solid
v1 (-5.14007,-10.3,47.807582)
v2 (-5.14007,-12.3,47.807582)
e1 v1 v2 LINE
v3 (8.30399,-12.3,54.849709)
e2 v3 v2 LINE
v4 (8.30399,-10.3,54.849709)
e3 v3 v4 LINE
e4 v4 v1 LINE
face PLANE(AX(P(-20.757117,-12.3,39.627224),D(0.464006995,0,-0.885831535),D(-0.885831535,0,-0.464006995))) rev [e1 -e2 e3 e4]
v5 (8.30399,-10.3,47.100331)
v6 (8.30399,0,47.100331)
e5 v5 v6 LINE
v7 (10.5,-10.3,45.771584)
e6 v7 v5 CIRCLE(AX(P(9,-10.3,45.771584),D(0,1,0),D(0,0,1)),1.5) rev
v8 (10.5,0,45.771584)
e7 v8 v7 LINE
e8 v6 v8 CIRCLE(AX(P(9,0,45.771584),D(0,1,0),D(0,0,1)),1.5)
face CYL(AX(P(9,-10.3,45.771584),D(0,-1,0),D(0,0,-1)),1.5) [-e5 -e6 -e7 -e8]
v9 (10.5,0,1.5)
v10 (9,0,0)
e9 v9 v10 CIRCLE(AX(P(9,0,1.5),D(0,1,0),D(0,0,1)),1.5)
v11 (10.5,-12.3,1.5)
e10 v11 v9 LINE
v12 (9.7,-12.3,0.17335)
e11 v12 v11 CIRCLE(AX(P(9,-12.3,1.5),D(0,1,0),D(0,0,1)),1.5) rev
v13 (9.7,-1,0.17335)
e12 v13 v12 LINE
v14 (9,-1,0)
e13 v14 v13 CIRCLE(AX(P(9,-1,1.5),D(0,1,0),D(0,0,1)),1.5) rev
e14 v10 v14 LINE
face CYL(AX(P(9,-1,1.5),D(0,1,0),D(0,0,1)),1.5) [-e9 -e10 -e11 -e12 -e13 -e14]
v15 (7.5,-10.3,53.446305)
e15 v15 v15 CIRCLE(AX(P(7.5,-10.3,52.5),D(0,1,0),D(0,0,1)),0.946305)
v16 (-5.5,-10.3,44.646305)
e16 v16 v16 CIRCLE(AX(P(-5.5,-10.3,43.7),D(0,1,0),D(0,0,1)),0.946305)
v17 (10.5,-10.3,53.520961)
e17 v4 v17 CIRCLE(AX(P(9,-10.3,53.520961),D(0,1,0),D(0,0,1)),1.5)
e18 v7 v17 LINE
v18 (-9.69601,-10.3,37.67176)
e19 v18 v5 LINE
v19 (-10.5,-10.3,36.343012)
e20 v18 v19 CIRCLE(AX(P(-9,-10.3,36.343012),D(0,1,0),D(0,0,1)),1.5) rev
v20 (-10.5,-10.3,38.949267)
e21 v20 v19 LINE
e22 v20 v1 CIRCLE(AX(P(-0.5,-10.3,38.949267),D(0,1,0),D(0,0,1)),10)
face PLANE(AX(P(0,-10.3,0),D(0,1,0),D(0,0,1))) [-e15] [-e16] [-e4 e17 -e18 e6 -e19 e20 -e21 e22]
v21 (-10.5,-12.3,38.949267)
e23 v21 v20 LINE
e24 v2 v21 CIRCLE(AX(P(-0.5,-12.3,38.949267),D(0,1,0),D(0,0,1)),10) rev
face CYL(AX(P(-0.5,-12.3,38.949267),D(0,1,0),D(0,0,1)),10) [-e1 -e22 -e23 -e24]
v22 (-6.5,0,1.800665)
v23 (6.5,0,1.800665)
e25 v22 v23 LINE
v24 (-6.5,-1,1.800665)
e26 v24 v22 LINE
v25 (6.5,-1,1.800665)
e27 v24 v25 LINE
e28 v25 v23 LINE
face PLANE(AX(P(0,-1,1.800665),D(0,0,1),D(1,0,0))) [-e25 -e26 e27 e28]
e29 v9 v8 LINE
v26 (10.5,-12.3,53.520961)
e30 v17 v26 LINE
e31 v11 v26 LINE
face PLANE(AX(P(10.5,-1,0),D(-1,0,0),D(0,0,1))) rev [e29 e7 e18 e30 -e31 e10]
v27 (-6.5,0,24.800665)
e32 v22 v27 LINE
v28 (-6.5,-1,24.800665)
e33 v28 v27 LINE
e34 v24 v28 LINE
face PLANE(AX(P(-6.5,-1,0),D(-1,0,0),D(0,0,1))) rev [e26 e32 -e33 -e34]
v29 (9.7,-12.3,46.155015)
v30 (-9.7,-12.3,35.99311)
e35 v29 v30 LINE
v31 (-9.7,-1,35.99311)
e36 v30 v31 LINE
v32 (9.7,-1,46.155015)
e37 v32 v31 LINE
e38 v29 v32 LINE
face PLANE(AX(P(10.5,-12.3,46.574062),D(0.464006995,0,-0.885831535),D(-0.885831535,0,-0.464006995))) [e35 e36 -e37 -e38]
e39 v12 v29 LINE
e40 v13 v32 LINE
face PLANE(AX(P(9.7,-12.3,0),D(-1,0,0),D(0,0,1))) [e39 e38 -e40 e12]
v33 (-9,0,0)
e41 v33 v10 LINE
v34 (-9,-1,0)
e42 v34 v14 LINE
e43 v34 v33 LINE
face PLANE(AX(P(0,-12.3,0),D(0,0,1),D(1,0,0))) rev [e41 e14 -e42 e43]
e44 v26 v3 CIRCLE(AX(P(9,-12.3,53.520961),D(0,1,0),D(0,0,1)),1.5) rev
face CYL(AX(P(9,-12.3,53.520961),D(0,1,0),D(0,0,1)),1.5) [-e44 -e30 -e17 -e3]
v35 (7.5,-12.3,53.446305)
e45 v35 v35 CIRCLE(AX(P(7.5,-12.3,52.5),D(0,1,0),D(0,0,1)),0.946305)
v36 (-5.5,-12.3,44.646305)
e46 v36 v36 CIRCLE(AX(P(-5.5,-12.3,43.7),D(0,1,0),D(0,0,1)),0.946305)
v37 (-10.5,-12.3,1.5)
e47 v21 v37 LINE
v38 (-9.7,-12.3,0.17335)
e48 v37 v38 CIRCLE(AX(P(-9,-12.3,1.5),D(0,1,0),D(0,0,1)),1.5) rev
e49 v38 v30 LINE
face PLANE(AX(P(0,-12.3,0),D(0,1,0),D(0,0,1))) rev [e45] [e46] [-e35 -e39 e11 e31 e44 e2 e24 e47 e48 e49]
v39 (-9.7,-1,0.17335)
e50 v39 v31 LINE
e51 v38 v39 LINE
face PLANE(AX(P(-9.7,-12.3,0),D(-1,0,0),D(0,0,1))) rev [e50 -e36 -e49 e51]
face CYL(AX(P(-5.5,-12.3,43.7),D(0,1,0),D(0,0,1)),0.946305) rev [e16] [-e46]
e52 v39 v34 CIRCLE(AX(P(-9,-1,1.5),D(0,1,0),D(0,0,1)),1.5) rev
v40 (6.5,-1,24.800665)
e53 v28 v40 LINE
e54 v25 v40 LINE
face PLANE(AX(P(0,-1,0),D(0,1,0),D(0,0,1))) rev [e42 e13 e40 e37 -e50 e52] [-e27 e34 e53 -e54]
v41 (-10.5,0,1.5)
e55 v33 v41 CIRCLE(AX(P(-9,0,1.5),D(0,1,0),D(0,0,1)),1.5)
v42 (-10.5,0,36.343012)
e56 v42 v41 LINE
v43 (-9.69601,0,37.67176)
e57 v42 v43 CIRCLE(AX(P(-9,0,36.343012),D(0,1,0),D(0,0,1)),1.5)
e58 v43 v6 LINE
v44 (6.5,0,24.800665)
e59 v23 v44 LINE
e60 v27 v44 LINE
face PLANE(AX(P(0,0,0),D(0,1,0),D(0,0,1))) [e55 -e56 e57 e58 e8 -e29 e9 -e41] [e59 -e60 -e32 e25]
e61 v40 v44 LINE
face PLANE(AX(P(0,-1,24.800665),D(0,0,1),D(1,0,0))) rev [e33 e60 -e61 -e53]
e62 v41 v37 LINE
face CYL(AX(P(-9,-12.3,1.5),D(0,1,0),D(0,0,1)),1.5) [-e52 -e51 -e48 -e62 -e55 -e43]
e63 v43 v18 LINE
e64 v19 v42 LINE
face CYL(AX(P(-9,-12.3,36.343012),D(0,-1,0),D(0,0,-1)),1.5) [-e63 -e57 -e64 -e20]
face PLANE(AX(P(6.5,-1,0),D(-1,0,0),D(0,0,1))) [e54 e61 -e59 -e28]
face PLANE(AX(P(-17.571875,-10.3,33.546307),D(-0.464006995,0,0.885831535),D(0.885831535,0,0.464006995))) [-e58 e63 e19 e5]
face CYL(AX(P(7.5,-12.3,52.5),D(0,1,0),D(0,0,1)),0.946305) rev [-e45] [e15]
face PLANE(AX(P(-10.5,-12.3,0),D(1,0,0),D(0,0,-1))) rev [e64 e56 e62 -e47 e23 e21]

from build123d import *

# Parameters (mm, degrees)
BOSS_EXTRUDE1_DEPTH   = 12.3
BOSS_EXTRUDE1_2_DEPTH = 12.3
SKETCH1_3_W           = 13
SKETCH1_3_H           = 23
BOSS_EXTRUDE2_DEPTH   = 1
SKETCH1_4_R           = 0.946305397
BOSS_EXTRUDE3_DEPTH   = 12.3
SKETCH1_6_R           = 0.946305397
CUT_EXTRUDE2_DEPTH    = 10.3
FILLET1_R             = 10
FILLET2_R             = 1.5


with BuildPart() as part:
    # Sketch1 → Boss-Extrude1 (new body)
    with BuildSketch(Plane(origin=(0, 0, 0), x_dir=(1, 0, 0), z_dir=(0, 1, 0))):
        Polygon((-9.7, 0), (-10.5, 0), (-10.5, -35.574062231), (-9.7, -35.99310985), align=None)
    extrude(amount=-BOSS_EXTRUDE1_DEPTH)



with BuildPart() as body_2:
    # Sketch1 → Boss-Extrude1 2 (new body)
    with BuildSketch(Plane(origin=(0, 0, 0), x_dir=(1, 0, 0), z_dir=(0, 1, 0))):
        Polygon((10.5, 0), (9.7, 0), (9.7, -46.155014612), (10.5, -46.574062231), align=None)
    extrude(amount=-BOSS_EXTRUDE1_2_DEPTH)


with BuildPart() as part_1:
    add(part.part)

    add(body_2.part)  # Boss-Extrude2 merges body 2
    # Sketch1<3> → Boss-Extrude2 (add)
    with BuildSketch(Plane(origin=(0, 0, 0), x_dir=(1, 0, 0), z_dir=(0, 1, 0))):
        Polygon((9.7, 0), (-9.7, 0), (-9.7, -36.489905511), (-10.5, -36.489905511), (-10.5, -37.250622364), (10.5, -48.250622364), (10.5, -46.642015581), (9.7, -46.642015581), align=None)
        with Locations((0, -13.300665343)):
            Rectangle(SKETCH1_3_W, SKETCH1_3_H, mode=Mode.SUBTRACT)
    extrude(amount=-BOSS_EXTRUDE2_DEPTH)

    # Sketch1<4> → Boss-Extrude3 (add)
    with BuildSketch(Plane(origin=(0, 0, 0), x_dir=(1, 0, 0), z_dir=(0, 1, 0))):
        Polygon((-10.5, -35.574062231), (-10.5, -45), (10.5, -56), (10.5, -46.574062231), align=None)
        with Locations((7.5, -52.5)):
            Circle(SKETCH1_4_R, mode=Mode.SUBTRACT)
        with Locations((-5.5, -43.7)):
            Circle(SKETCH1_4_R, mode=Mode.SUBTRACT)
    extrude(amount=-BOSS_EXTRUDE3_DEPTH)

    # Sketch1<6> → Cut-Extrude2 (cut)
    with BuildSketch(Plane(origin=(0, 0, 0), x_dir=(1, 0, 0), z_dir=(0, 1, 0))):
        Polygon((10.5, -48.250622364), (-10.5, -37.250622364), (-10.5, -45), (10.5, -56), align=None)
        with Locations((-5.5, -43.7)):
            Circle(SKETCH1_6_R, mode=Mode.SUBTRACT)
        with Locations((7.5, -52.5)):
            Circle(SKETCH1_6_R, mode=Mode.SUBTRACT)
    extrude(amount=-CUT_EXTRUDE2_DEPTH, mode=Mode.SUBTRACT)

    # Fillet1
    fillet1_edges = [part_1.edges().sort_by_distance(p)[0] for p in [
        (-10.5, -11.3, 45),
    ]]
    fillet(fillet1_edges, radius=FILLET1_R)

    # Fillet2
    fillet2_edges = [part_1.edges().sort_by_distance(p)[0] for p in [
        (10.5, -6.15, 0),
        (10.5, -11.3, 56),
        (10.5, -5.15, 48.250622364),
        (-10.5, -6.15, 0),
        (-10.5, -5.15, 37.250622364),
    ]]
    fillet(fillet2_edges, radius=FILLET2_R)


solid = part_1.part
